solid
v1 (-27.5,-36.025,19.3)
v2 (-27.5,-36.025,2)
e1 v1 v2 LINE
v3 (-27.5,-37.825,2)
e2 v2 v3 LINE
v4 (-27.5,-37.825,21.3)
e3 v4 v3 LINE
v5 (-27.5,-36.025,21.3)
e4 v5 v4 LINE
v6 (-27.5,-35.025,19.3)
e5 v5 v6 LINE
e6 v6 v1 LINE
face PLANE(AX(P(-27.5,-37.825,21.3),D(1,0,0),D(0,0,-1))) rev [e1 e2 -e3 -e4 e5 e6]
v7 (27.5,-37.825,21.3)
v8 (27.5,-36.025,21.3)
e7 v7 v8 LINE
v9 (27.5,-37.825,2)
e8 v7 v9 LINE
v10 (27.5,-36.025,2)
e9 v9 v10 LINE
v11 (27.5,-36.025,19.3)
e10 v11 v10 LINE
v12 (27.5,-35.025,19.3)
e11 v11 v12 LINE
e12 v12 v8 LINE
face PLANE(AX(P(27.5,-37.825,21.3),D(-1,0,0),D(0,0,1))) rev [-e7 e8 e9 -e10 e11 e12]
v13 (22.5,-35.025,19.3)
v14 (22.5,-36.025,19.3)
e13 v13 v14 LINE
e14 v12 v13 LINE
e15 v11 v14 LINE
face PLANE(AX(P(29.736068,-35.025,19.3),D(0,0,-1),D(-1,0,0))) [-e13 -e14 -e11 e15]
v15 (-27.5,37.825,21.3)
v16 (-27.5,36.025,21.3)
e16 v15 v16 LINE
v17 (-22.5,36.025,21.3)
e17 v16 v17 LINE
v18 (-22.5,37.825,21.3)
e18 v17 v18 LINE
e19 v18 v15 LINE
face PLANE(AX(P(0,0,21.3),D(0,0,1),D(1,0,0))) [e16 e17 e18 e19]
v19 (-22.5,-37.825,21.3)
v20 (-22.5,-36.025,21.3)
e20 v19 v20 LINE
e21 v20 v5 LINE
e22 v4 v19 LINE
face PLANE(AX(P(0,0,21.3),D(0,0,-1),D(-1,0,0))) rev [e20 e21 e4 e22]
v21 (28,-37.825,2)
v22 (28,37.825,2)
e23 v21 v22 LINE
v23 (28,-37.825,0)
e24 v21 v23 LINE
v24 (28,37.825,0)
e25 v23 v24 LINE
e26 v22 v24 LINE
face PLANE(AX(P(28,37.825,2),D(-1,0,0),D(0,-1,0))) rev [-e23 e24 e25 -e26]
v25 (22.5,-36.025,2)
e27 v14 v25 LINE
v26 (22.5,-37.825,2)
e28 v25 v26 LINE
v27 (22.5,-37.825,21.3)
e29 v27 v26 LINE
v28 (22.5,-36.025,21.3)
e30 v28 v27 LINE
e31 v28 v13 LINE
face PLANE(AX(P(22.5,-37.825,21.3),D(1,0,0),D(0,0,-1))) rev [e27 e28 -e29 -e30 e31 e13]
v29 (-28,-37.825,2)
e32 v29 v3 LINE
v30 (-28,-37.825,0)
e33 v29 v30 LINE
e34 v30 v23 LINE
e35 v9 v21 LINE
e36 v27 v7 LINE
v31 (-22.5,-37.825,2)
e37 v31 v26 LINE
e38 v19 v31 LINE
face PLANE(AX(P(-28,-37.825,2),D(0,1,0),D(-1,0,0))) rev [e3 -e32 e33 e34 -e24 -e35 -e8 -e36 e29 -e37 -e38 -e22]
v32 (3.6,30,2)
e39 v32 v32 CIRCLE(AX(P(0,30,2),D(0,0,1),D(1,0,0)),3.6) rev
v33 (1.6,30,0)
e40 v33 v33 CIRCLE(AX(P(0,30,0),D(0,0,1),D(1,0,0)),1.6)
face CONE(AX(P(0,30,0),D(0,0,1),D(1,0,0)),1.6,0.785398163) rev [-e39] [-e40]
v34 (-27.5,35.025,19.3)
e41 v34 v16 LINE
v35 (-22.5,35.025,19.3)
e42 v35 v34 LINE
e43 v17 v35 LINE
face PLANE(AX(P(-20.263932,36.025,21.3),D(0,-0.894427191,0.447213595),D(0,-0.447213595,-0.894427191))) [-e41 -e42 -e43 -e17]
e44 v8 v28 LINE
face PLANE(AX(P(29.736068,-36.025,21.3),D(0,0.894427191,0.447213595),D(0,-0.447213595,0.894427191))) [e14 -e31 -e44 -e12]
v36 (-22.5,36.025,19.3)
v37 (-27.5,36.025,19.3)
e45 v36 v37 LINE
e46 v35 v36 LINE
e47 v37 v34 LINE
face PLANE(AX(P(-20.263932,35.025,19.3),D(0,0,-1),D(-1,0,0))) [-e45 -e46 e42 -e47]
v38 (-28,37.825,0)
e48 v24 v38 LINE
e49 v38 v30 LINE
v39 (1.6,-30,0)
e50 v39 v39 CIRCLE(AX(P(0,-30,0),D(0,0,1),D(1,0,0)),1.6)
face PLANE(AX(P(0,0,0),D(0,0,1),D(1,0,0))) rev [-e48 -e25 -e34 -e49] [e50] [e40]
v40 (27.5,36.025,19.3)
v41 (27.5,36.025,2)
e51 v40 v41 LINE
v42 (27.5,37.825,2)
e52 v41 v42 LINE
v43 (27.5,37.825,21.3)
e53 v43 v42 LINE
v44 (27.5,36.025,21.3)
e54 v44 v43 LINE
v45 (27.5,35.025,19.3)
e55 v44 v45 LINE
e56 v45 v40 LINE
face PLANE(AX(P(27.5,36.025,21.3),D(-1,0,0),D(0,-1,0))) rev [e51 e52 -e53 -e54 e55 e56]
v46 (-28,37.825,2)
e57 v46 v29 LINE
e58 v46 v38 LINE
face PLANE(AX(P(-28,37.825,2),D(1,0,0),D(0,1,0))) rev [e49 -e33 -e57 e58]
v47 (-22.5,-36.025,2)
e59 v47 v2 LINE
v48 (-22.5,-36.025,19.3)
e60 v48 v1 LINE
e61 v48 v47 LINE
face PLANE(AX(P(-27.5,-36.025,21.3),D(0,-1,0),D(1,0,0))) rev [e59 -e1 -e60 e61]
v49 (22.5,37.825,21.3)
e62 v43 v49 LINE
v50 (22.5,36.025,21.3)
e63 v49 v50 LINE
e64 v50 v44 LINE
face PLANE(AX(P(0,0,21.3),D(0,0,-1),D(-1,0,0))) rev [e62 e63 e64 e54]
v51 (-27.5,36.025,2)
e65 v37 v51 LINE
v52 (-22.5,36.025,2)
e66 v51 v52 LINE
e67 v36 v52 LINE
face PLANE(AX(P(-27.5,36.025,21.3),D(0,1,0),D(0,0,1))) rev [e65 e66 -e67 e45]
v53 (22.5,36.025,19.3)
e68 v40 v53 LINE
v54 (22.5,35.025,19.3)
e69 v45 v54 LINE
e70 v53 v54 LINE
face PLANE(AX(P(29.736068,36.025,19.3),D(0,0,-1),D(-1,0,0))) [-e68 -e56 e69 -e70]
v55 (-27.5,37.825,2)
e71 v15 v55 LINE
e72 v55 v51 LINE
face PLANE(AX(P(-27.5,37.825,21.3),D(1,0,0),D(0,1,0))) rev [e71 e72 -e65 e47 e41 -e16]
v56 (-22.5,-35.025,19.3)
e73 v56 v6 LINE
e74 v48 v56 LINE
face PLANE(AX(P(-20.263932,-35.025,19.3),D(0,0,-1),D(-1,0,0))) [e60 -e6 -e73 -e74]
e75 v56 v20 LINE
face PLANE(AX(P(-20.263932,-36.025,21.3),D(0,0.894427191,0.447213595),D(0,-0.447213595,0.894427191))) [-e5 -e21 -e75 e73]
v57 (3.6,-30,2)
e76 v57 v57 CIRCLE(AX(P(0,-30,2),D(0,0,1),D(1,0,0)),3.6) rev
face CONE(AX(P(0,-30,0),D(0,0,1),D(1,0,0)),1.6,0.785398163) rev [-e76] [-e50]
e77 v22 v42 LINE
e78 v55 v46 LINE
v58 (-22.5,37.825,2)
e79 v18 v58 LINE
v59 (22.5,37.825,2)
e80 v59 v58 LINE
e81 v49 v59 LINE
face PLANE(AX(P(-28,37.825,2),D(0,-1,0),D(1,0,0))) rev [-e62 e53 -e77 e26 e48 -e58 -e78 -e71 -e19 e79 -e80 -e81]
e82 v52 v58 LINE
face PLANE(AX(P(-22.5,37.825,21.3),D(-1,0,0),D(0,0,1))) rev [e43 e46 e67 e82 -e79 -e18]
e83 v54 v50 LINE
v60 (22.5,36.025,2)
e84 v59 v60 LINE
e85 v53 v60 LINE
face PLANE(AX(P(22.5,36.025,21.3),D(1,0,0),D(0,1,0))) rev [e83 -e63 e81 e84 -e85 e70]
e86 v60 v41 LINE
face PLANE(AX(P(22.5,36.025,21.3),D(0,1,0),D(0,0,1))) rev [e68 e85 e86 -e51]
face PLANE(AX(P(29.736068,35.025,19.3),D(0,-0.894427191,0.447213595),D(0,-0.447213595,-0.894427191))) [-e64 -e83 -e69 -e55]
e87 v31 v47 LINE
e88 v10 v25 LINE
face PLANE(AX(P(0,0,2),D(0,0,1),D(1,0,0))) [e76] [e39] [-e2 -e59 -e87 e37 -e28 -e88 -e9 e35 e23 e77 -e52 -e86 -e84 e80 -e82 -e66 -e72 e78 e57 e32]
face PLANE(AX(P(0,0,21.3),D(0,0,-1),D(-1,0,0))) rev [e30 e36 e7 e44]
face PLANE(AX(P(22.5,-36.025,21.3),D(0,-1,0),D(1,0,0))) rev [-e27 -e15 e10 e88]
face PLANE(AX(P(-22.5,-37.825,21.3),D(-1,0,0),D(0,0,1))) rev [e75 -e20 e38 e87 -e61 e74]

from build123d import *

# Parameters (mm, degrees)
SKETCH_1_W          = 56
SKETCH_1_H          = 75.65
EXTRUDE_1_DEPTH     = 2
SKETCH_2_W          = 5
SKETCH_2_H          = 1.8
EXTRUDE_2_DEPTH     = 19.3
EXTRUDE_3_DEPTH     = 5
EXTRUDE_4_DEPTH     = 5
EXTRUDE_5_DEPTH     = 5
EXTRUDE_6_DEPTH     = 5
SKETCH_7_R          = 1.6
CUT_EXTRUDE_1_DEPTH = 51.864728693
CHAMFER_1_SIZE      = 2


with BuildPart() as part:
    # 草图1 → 凸台-拉伸1 (new body)
    with BuildSketch(Plane.XY):
        Rectangle(SKETCH_1_W, SKETCH_1_H)
    extrude(amount=EXTRUDE_1_DEPTH)

    # 草图2 → 凸台-拉伸2 (add)
    with BuildSketch(Plane.XY.offset(2)):
        with Locations((-25, 36.925)):
            Rectangle(SKETCH_2_W, SKETCH_2_H)
        with Locations((25, 36.925)):
            Rectangle(SKETCH_2_W, SKETCH_2_H)
        with Locations((-25, -36.925)):
            Rectangle(SKETCH_2_W, SKETCH_2_H)
        with Locations((25, -36.925)):
            Rectangle(SKETCH_2_W, SKETCH_2_H)
    extrude(amount=EXTRUDE_2_DEPTH)

    # 草图3 → 凸台-拉伸3 (add)
    with BuildSketch(Plane.ZY.offset(27.5)):
        Polygon((21.3, 36.025), (19.3, 35.025), (19.3, 36.025), align=None)
    extrude(amount=-EXTRUDE_3_DEPTH)

    # 草图4 → 凸台-拉伸4 (add)
    with BuildSketch(Plane.ZY.offset(-22.5)):
        Polygon((19.3, 36.025), (19.3, 35.025), (21.3, 36.025), align=None)
    extrude(amount=-EXTRUDE_4_DEPTH)

    # 草图5 → 凸台-拉伸5 (add)
    with BuildSketch(Plane.ZY.offset(27.5)):
        Polygon((21.3, -36.025), (19.3, -35.025), (19.3, -36.025), align=None)
    extrude(amount=-EXTRUDE_5_DEPTH)

    # 草图6 → 凸台-拉伸6 (add)
    with BuildSketch(Plane.ZY.offset(-22.5)):
        Polygon((19.3, -36.025), (21.3, -36.025), (19.3, -35.025), align=None)
    extrude(amount=-EXTRUDE_6_DEPTH)

    # 草图7 → 切除-拉伸1 (cut, through all)
    with BuildSketch(Plane.XY.offset(2)):
        with Locations((0, 30)):
            Circle(SKETCH_7_R)
        with Locations((0, -30)):
            Circle(SKETCH_7_R)
    extrude(amount=-CUT_EXTRUDE_1_DEPTH, mode=Mode.SUBTRACT)

    # 倒角1
    chamfer_1_edges = [part.edges().sort_by_distance(p)[0] for p in [
        (-1.6, 30, 2),
        (-1.6, -30, 2),
    ]]
    chamfer(chamfer_1_edges, length=CHAMFER_1_SIZE - 0.0001)  # a hair under: the kernel refuses the full size


solid = part.part
